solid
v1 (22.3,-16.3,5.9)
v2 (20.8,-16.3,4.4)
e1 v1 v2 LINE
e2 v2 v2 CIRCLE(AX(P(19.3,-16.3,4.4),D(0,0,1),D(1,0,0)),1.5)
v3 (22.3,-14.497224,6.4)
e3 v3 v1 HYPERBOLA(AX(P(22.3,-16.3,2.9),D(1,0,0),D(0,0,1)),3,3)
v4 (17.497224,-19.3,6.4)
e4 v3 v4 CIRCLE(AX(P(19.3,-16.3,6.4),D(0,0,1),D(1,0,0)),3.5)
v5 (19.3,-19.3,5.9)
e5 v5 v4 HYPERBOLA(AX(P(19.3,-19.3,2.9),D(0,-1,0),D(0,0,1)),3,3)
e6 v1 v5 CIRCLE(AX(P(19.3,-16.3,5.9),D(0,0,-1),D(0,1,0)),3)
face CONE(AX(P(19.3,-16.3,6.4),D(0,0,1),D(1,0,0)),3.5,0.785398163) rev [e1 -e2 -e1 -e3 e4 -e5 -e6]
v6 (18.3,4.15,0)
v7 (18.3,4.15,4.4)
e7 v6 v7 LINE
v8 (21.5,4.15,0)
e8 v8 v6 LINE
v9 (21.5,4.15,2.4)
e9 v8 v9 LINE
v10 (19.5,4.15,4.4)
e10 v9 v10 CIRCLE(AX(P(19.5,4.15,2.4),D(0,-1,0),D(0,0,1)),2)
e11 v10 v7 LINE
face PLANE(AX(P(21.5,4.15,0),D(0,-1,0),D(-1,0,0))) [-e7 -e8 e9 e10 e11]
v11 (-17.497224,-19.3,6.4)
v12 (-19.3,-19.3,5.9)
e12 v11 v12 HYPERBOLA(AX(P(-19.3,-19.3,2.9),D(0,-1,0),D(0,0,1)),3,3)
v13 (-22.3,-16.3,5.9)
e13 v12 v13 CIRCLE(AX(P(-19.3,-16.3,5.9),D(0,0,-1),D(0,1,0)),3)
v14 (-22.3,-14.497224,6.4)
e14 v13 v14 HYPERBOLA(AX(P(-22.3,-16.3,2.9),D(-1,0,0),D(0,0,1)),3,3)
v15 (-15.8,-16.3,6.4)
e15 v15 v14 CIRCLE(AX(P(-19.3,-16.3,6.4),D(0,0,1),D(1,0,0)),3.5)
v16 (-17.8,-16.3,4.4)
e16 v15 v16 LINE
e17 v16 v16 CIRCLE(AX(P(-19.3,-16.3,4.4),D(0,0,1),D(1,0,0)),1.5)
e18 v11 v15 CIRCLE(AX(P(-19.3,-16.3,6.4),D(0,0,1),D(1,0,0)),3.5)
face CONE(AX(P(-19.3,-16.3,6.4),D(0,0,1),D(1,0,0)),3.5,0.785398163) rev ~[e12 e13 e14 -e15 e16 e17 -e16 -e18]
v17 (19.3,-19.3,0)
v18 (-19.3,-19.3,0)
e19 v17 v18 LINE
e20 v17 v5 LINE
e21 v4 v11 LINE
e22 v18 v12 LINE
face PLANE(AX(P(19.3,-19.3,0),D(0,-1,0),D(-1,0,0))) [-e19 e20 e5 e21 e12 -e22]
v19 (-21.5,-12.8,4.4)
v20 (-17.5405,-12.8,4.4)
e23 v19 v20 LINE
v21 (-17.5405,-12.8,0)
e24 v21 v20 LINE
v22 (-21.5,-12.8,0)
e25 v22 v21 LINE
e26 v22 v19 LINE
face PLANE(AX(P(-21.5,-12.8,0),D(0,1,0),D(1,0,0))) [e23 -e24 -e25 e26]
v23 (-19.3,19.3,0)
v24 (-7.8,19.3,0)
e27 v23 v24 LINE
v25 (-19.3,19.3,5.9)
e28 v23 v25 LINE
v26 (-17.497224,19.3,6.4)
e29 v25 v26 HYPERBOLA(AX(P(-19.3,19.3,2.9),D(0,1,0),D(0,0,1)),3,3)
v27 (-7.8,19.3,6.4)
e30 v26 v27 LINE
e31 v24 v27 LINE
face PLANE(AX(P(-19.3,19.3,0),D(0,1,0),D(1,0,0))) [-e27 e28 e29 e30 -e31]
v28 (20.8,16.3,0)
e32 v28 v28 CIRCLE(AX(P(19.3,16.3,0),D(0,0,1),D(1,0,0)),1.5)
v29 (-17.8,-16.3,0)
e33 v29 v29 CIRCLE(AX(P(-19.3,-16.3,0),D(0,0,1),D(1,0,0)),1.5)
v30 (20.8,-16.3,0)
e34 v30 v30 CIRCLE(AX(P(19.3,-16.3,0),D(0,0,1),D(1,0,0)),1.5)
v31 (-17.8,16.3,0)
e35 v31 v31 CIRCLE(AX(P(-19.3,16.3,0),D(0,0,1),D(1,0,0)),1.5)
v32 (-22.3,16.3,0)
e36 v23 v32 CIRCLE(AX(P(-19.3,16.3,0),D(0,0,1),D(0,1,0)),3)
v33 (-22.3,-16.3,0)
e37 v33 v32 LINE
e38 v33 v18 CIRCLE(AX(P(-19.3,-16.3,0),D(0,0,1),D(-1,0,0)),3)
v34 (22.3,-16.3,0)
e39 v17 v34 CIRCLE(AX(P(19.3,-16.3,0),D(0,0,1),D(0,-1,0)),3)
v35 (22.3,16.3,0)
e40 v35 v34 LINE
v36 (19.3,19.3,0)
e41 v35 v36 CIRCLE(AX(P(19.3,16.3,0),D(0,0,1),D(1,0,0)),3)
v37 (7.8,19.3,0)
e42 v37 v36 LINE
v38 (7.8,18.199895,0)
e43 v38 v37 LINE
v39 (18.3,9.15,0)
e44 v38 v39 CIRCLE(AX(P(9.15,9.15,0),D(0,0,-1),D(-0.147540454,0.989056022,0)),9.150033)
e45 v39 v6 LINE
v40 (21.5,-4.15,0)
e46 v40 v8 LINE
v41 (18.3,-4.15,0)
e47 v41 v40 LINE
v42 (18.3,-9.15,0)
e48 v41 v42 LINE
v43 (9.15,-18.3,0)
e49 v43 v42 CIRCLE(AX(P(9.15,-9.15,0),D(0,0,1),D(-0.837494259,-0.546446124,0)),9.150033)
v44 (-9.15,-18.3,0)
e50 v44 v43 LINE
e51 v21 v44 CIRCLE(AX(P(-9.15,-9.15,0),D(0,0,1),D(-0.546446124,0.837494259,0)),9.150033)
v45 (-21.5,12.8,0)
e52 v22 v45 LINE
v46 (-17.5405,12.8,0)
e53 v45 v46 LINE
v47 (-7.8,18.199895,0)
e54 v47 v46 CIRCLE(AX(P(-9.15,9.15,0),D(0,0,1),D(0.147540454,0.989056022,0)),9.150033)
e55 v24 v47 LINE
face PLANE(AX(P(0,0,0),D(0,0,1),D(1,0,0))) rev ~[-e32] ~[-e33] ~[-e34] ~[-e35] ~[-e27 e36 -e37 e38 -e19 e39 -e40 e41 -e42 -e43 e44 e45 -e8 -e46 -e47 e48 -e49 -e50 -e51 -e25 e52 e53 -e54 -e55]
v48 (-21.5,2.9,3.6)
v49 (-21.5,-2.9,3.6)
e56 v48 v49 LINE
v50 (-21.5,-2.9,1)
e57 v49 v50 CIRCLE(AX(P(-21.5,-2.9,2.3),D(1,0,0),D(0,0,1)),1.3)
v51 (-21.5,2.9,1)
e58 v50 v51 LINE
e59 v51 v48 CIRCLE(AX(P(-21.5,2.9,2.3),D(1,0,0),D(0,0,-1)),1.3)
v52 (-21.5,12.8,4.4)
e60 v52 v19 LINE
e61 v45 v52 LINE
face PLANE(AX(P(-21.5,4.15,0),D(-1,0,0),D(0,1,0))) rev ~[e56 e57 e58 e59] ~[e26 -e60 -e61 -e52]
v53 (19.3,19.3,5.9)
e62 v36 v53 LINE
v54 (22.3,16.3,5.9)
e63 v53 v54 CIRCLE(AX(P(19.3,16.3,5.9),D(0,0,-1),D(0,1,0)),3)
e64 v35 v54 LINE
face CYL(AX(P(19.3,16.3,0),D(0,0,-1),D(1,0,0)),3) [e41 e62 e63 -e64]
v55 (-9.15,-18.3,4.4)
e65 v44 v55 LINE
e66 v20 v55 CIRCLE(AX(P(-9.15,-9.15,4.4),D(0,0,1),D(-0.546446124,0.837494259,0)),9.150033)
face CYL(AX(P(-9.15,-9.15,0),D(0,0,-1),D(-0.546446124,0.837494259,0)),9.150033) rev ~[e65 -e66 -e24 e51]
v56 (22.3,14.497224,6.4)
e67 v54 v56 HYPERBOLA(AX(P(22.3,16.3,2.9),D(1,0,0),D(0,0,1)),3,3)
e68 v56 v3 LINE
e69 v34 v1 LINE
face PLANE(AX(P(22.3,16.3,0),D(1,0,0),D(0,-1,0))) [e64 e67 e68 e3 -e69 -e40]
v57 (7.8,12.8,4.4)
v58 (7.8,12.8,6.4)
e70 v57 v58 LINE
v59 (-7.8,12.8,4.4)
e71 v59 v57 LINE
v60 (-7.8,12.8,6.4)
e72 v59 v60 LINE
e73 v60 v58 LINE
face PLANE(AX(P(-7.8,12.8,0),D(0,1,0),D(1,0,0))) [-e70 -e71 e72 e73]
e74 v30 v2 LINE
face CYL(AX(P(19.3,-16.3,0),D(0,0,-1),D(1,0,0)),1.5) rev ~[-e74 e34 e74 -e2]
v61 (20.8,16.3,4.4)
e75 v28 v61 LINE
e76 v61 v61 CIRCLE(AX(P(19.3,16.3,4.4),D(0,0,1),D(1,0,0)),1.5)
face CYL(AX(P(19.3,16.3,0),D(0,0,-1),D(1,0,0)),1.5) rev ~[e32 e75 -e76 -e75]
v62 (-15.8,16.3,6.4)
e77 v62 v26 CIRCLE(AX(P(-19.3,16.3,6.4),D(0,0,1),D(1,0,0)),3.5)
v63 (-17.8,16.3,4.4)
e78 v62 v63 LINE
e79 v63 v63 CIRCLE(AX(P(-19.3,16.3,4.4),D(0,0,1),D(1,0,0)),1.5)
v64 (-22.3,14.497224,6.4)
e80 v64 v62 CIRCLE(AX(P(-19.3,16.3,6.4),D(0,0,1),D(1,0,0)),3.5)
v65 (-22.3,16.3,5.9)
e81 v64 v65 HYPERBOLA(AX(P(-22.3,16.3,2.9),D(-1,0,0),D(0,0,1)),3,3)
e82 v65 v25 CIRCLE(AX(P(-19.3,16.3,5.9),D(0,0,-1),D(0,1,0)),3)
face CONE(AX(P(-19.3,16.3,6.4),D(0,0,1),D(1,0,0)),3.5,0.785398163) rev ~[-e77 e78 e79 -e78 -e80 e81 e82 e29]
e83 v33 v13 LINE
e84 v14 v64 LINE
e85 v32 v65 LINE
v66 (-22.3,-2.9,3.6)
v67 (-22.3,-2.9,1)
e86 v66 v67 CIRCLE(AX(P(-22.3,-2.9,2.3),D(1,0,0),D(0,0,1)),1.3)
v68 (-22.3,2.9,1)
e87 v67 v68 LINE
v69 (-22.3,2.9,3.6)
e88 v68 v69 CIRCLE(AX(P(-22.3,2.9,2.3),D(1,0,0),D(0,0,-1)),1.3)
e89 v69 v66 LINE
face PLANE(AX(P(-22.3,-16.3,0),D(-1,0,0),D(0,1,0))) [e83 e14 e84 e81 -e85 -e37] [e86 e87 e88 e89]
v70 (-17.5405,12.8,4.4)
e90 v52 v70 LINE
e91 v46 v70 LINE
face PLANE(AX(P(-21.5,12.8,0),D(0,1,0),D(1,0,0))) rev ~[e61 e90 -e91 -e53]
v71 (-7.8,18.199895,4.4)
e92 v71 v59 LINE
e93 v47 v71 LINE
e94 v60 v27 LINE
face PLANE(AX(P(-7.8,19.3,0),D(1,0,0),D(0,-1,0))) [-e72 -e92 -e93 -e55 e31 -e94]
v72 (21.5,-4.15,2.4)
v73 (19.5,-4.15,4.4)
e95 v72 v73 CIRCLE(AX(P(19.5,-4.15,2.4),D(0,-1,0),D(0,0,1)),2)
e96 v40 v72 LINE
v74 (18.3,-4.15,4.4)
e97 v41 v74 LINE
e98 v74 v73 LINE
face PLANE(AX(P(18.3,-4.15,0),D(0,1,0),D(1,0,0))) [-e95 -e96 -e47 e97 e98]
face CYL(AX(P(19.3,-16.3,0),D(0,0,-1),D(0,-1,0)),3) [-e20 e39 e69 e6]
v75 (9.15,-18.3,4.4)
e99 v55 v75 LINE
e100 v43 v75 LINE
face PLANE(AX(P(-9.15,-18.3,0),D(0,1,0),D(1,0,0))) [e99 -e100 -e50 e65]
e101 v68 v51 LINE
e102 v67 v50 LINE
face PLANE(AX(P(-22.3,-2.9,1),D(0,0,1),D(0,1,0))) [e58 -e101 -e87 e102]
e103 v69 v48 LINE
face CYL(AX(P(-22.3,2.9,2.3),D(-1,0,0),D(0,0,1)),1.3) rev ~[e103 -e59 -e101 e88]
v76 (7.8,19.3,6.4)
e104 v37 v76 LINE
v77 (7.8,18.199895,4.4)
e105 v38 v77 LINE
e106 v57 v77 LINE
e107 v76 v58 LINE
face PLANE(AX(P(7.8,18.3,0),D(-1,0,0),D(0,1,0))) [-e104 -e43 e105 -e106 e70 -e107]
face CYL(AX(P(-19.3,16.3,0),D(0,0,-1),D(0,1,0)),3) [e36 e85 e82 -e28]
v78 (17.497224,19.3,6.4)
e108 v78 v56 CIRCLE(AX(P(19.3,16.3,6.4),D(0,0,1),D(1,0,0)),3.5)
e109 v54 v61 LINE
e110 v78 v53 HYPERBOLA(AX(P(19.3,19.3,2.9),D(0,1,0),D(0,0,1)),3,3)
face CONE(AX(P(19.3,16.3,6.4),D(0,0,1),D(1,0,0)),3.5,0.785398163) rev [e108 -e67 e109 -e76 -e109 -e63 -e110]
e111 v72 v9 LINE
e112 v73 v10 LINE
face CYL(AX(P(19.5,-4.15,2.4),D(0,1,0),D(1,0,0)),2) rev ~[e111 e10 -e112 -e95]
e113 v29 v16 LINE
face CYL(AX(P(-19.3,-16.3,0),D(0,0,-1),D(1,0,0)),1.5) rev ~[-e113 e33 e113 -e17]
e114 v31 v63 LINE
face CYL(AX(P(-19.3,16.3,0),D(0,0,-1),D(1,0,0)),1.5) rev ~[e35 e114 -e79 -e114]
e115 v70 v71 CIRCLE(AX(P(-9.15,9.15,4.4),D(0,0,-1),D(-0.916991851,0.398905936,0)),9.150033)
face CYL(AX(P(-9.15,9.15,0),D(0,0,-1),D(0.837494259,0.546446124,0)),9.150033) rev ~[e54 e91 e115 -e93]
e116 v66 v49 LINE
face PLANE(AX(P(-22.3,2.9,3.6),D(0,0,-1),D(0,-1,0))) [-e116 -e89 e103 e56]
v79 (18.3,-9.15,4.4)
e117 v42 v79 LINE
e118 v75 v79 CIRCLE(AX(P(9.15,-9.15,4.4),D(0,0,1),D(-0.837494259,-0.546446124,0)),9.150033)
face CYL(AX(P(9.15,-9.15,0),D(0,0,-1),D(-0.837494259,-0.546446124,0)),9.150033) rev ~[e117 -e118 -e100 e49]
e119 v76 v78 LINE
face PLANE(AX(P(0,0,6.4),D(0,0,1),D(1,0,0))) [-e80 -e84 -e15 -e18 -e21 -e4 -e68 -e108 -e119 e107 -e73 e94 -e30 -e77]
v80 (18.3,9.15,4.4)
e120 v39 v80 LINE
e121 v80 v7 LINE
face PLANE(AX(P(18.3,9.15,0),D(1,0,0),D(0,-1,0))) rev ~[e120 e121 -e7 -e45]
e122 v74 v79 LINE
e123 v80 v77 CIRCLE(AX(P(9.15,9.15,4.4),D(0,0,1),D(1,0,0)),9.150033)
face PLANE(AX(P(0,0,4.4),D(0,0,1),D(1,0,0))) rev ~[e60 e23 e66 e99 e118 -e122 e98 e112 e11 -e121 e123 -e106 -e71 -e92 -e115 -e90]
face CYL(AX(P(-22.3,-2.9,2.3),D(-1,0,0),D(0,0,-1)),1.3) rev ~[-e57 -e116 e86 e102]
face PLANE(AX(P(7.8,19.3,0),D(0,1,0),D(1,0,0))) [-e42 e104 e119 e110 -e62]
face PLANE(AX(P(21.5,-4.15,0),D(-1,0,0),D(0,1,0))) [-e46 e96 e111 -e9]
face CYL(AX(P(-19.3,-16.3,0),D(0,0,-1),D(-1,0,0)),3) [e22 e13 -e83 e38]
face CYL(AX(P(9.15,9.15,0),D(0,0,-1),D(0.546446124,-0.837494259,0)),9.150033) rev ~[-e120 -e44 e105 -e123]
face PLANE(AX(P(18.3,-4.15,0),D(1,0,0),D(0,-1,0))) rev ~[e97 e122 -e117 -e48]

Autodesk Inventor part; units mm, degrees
ref_plane "YZ Plane" through (0, 0, 0) normal (1, 0, 0) x (0, 1, 0)
ref_plane "XZ Plane" through (0, 0, 0) normal (0, 1, 0) x (-1, 0, 0)
ref_plane "XY Plane" through (0, 0, 0) normal (0, 0, 1) x (1, 0, 0)
sketch "Эскиз1" plane through (0, 0, 0) normal (0, 0, 1) x (1, 0, 0)
  arc A0 (-22.3, -16.3) -> (-19.3, -19.3) centre (-19.3, -16.3) ccw
  line L0 (-22.3, -16.3) -> (-22.3, 16.3)
  arc A1 (-19.3, 19.3) -> (-22.3, 16.3) centre (-19.3, 16.3) ccw
  line L1 (-19.3, 19.3) -> (19.3, 19.3)
  arc A2 (22.3, 16.3) -> (19.3, 19.3) centre (19.3, 16.3) ccw
  line L2 (22.3, 16.3) -> (22.3, -16.3)
  arc A3 (19.3, -19.3) -> (22.3, -16.3) centre (19.3, -16.3) ccw
  line L3 (19.3, -19.3) -> (-19.3, -19.3)
  circle A4 centre (19.3, 16.3) radius 2 construction
  circle A5 centre (-19.3, 16.3) radius 2 construction
  circle A6 centre (-19.3, -16.3) radius 2 construction
  circle A7 centre (19.3, -16.3) radius 2 construction
  arc A8 (-1.4869, 14.15) -> (-14.15, 1.4869) centre (-9.15, 9.15) ccw
  line L4 (-14.15, 1.4869) -> (-14.15, -1.4869)
  arc A9 (-14.15, -1.4869) -> (-1.4869, -14.15) centre (-9.15, -9.15) ccw
  line L5 (-1.4869, -14.15) -> (1.4869, -14.15)
  arc A10 (1.4869, -14.15) -> (14.15, -1.4869) centre (9.15, -9.15) ccw
  line L6 (14.15, -1.4869) -> (14.15, 1.4869)
  arc A11 (14.15, 1.4869) -> (1.4869, 14.15) centre (9.15, 9.15) ccw
  line L7 (1.4869, 14.15) -> (-1.4869, 14.15)
  line L8 (-9.15, 9.15) -> (-9.15, 18.3) construction
  line L9 (9.15, 9.15) -> (9.15, 18.3) construction
  line L10 (-9.15, 9.15) -> (-18.3, 9.15) construction
  line L11 (-9.15, -9.15) -> (-18.3, -9.15) construction
  line L12 (-18.3, 9.15) -> (-18.3, -9.15)
  line L13 (-9.15, 18.3) -> (9.15, 18.3)
  line L14 (-22.3, 0) -> (22.3, 0) construction
  line L15 (0, 19.3) -> (0, -19.3) construction
  line L16 (18.3, 9.15) -> (18.3, -9.15)
  line L17 (-9.15, -18.3) -> (9.15, -18.3)
  circle A12 centre (-19.3, 16.3) radius 1.5
  circle A13 centre (19.3, 16.3) radius 1.5
  circle A14 centre (19.3, -16.3) radius 1.5
  circle A15 centre (-19.3, -16.3) radius 1.5
  line L18 (0, 19.3) -> (-7.8, 19.3) construction
  line L19 (-7.8, 19.3) -> (-7.8, 12.8) construction
  line L20 (-7.8, 12.8) -> (0, 12.8) construction
  line L21 (0, 12.8) -> (0, 19.3) construction
  line L22 (-7.8, 12.8) -> (7.8, 12.8)
  line L23 (7.8, 12.8) -> (7.8, 19.3)
  line L24 (7.8, 19.3) -> (-7.8, 19.3)
  line L25 (-7.8, 19.3) -> (-7.8, 12.8)
  line L26 (-18.3, 9.15) -> (-18.3, 4.15) construction
  line L27 (-18.3, -9.15) -> (-18.3, -4.15) construction
  line L28 (-18.3, -4.15) -> (-21.5, -4.15)
  line L29 (-21.5, -4.15) -> (-21.5, 4.15)
  line L30 (-21.5, 4.15) -> (-18.3, 4.15)
  line L31 (-18.3, 4.15) -> (-18.3, -4.15)
  line L32 (18.3, -4.15) -> (21.5, -4.15)
  line L33 (21.5, -4.15) -> (21.5, 4.15)
  line L34 (21.5, 4.15) -> (18.3, 4.15)
  line L35 (18.3, 4.15) -> (18.3, -4.15)
  line L36 (-21.5, 0) -> (-21.5, 12.8)
  line L37 (-21.5, 12.8) -> (-17.5405, 12.8)
  line L38 (-21.5, 0) -> (-21.5, -12.8)
  line L39 (-21.5, -12.8) -> (-17.5405, -12.8)
  point P0 (7.8, 18.1999)
  point P1 (-7.8, 18.1999)
  dimension "d5" = 3
  dimension "d6" = 3
  dimension "d7" = 3
  dimension "d8" = 3
  dimension "d9" = 7.8
  dimension "d10" = 6.5
  dimension "d11" = 15.6
  dimension "d12" = 6.5
  dimension "d13" = 5
  dimension "d14" = 5
  dimension "d15" = 3.2
  dimension "d16" = 8.3
  dimension "d19" = 12.8
extrude "Выдавливание1" add sketch "Эскиз1" along normal blind 6.4 contours L0 A1 L1 L25 L13 A8 L37 L36 L29 L38 L39 A9 L17 A10 L16 L32 L33 L34 A11 L23 A2 L2 A3 L3 A0 | L25 A8 L13 | L13 A11 L23 | A8 L25 L22 L23 A11 L6 A10 L5 A9 L4 | A8 L12 L30 L36 L37 | L16 A10 L6 A11 | A8 L4 A9 L12 | L34 L33 L32 L16 | L12 L28 L29 L30 | L12 A9 L39 L38 L28 | L17 A9 L5 A10
chamfer "Фаска1" distance 2 angle 45 4 edges at (17.8, 16.3, 6.4) (-20.8, 16.3, 6.4) (-20.8, -16.3, 6.4) (17.8, -16.3, 6.4)
extrude "Выдавливание2" cut sketch "Эскиз1" along normal blind 4.4 contours A8 L25 L22 L23 A11 L6 A10 L5 A9 L4 | A8 L12 L30 L36 L37 | L16 A10 L6 A11 | A8 L4 A9 L12 | L34 L33 L32 L16 | L12 L28 L29 L30 | L12 A9 L39 L38 L28 | L17 A9 L5 A10
sketch "Эскиз2" plane through (-22.3, -16.3, 0) normal (-1, 0, 0) x (0, 0, 1)
  line L0 (0, -3) -> (0, 0) projected
  line L1 (0, 35.6) -> (5.9, 35.6) projected
  line L2 (0, -3) -> (0, 35.6) construction
  line L3 (0, 16.3) -> (6.4, 16.3) construction
  line L4 (6.4, 30.7972) -> (6.4, 1.8028) projected
  line L5 (0, 16.3) -> (1, 16.3) construction
  line L6 (1, 16.3) -> (1, 20.5) construction
  line L7 (1, 20.5) -> (0, 20.5) construction
  line L8 (0, 20.5) -> (0, 16.3) construction
  line L9 (1, 20.5) -> (3.6, 20.5)
  line L10 (3.6, 20.5) -> (3.6, 12.1)
  line L11 (3.6, 12.1) -> (1, 12.1)
  line L12 (1, 12.1) -> (1, 20.5)
  line L13 (1, 20.5) -> (2.3, 20.5) construction
  line L14 (2.3, 20.5) -> (2.3, 19.2) construction
  line L15 (2.3, 19.2) -> (1, 19.2) construction
  line L16 (1, 19.2) -> (1, 20.5) construction
  arc A0 (3.6, 19.2) -> (1, 19.2) centre (2.3, 19.2) ccw
  arc A1 (1, 13.4) -> (3.6, 13.4) centre (2.3, 13.4) ccw
  point P0 (3.6, 13.4)
  point P1 (1, 19.2)
  point P2 (1, 13.4)
  point P3 (2.3, 12.1)
  point P4 (2.3, 20.5)
  dimension "d20" = 1
  dimension "d21" = 4.2
  dimension "d22" = 2.6
  dimension "d23" = 8.4
  dimension "d24" = 1.3
  dimension "d25" = 1.3
extrude "Выдавливание3" cut sketch "Эскиз2" against normal blind 0.8 contours A0 L10 A1 L12
fillet "Сопряжение1" radius 2 1 edges at (21.5, 0, 4.4)
properties part number "akkum_cap_pd"
